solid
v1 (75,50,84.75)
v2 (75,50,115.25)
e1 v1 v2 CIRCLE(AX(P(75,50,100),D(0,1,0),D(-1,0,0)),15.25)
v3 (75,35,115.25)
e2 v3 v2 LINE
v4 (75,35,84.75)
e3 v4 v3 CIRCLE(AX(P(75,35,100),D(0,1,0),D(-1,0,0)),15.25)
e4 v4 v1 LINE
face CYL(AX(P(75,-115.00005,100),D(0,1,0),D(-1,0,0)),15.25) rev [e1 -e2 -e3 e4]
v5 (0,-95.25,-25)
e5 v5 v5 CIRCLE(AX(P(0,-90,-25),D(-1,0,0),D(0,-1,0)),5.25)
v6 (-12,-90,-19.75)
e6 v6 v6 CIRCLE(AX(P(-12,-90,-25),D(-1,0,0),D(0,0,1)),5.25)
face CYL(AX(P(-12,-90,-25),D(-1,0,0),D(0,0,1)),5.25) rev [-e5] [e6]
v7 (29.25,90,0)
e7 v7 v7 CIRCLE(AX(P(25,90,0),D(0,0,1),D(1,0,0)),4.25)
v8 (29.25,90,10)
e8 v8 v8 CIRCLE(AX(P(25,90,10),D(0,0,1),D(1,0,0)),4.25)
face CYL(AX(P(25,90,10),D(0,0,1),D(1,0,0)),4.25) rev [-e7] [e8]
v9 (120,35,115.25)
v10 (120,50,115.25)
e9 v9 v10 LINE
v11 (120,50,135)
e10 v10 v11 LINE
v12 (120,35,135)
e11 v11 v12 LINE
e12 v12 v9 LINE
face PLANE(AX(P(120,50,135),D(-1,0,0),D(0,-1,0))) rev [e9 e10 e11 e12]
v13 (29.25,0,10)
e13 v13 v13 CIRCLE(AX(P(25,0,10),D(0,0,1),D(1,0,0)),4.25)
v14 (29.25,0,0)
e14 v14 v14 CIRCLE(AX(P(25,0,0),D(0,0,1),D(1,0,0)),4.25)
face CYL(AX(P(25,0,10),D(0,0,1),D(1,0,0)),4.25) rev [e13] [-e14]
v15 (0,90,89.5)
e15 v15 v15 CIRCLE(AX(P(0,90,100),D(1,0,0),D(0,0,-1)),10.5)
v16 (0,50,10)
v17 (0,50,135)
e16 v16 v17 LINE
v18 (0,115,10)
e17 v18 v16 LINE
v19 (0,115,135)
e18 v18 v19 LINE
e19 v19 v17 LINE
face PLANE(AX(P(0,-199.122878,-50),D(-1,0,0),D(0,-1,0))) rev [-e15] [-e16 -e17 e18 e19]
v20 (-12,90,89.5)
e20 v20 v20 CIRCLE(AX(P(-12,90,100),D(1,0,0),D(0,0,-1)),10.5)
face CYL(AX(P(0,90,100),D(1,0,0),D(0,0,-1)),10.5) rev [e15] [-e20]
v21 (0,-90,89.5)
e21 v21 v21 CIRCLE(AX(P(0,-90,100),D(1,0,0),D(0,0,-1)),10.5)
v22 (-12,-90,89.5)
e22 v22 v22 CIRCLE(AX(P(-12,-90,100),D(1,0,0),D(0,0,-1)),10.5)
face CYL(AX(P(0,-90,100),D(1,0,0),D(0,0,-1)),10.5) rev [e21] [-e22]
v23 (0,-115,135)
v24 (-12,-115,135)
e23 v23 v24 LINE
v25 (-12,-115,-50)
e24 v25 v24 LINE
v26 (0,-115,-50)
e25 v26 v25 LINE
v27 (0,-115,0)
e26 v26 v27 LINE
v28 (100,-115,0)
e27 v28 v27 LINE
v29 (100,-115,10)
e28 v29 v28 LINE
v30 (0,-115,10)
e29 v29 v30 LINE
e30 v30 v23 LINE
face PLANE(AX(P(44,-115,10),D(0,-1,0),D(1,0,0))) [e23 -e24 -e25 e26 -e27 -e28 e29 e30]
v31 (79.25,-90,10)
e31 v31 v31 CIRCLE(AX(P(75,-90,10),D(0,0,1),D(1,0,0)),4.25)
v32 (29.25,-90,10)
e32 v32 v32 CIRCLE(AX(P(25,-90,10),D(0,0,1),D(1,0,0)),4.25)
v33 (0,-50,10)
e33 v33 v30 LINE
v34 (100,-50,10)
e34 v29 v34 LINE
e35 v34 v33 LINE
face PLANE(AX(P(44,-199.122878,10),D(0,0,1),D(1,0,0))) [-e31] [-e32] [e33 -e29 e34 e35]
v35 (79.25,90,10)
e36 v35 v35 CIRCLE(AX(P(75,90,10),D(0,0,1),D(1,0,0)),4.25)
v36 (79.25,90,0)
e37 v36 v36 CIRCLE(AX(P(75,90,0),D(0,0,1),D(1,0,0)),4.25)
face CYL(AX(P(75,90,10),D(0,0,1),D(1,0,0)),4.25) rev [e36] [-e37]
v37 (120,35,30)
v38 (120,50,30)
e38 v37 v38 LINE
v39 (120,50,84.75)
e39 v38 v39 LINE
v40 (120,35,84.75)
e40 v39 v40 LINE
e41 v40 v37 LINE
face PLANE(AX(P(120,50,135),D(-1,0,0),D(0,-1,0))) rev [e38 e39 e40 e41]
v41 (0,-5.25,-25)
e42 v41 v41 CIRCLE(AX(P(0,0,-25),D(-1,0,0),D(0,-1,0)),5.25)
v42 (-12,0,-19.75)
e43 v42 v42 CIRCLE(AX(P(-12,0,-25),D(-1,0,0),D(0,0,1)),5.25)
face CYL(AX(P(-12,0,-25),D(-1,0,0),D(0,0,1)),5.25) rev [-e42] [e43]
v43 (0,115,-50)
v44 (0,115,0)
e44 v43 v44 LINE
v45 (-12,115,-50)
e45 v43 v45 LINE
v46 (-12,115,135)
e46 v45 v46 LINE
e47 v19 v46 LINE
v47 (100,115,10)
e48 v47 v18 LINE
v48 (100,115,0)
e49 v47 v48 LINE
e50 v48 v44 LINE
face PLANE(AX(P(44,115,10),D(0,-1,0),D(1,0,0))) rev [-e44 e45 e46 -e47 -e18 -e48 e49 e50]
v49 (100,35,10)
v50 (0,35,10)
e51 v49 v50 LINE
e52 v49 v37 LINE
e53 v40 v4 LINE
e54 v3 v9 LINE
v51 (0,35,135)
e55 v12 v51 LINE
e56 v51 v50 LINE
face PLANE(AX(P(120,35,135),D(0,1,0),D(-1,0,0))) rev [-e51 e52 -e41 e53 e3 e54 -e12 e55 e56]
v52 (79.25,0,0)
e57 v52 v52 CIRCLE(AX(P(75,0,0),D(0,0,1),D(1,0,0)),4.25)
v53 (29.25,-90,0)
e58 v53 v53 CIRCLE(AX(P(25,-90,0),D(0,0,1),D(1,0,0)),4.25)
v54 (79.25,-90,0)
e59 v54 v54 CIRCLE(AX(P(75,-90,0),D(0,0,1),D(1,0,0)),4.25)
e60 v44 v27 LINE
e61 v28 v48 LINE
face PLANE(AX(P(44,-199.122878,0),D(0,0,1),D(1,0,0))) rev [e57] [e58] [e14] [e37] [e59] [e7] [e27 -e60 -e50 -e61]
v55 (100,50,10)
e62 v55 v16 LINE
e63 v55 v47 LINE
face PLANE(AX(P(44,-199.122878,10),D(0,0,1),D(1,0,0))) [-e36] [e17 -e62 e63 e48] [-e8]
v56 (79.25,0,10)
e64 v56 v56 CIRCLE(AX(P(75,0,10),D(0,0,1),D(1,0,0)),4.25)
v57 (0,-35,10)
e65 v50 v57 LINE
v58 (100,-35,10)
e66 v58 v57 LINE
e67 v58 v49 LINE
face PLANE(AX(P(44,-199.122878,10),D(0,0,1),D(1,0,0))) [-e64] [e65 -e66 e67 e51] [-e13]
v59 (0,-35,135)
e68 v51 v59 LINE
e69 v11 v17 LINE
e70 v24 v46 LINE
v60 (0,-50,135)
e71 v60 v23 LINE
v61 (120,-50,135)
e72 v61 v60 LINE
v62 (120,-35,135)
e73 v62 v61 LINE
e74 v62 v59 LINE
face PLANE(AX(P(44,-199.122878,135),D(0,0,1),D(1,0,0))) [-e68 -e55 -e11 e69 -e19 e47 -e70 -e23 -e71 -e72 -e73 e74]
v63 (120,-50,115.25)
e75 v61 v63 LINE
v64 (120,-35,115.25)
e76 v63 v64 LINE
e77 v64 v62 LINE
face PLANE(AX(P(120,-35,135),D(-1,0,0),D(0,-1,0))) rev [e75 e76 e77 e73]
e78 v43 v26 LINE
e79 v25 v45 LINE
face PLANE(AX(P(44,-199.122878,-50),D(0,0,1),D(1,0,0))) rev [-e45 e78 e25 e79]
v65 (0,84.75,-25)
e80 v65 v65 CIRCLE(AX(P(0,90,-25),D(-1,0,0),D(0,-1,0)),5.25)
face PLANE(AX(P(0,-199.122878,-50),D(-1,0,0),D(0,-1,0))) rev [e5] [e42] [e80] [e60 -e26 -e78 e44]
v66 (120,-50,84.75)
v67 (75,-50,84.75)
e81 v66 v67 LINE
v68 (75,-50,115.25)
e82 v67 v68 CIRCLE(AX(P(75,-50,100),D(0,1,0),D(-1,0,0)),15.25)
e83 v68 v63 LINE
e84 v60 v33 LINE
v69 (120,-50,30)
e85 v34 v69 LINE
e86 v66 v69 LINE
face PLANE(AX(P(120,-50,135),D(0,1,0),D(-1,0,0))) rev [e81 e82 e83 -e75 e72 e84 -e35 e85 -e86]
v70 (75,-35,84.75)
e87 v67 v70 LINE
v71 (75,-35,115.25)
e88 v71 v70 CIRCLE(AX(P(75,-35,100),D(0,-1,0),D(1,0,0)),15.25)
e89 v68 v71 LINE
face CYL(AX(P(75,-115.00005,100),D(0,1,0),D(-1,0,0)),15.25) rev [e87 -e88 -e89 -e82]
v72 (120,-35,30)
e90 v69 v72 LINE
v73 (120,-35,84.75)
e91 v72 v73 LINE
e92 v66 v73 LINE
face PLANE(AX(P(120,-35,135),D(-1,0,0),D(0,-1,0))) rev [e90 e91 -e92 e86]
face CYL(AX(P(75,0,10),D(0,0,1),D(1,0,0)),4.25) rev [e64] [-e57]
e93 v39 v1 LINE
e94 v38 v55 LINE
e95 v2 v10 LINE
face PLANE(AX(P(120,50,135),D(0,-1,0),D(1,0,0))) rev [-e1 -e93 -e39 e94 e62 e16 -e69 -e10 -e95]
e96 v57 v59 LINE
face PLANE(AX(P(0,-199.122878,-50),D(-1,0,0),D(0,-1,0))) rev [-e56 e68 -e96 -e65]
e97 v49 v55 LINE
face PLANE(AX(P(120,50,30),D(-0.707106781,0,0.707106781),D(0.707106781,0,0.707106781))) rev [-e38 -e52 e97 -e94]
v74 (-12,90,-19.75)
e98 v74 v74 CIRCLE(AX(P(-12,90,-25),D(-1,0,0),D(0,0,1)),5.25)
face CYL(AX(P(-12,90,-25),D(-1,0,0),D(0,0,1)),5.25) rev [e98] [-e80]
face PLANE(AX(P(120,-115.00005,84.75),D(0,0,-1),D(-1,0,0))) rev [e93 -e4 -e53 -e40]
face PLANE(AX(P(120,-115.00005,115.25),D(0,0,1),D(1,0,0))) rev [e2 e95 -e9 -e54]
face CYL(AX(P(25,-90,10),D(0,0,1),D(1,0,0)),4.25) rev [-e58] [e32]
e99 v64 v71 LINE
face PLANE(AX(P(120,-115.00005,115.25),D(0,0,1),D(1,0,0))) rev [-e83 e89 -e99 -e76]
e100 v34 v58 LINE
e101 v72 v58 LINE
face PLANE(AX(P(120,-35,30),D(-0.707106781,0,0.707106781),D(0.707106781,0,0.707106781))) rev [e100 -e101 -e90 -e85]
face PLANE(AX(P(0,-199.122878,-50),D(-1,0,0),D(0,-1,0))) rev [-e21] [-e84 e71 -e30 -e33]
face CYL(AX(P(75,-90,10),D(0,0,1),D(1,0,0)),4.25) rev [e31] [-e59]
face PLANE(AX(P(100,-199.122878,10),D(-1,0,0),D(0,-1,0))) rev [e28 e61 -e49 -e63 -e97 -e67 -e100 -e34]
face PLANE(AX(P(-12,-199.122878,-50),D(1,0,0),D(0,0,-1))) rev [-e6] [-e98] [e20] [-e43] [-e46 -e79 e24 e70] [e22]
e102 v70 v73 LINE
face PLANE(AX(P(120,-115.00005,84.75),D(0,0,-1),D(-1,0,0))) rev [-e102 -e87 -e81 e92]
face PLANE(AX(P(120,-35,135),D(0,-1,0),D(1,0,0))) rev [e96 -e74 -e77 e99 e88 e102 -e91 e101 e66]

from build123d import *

# Parameters (mm, degrees)
SKETCH_1_W              = 100
SKETCH_1_H              = 230
EXTRUDE_1_DEPTH         = 10
EXTRUDE_2_DEPTH         = 135
EXTRUDE_2_DEPTH_BACK    = 50
SKETCH_1_3_W            = 12
SKETCH_1_3_H            = 230
SKETCH_2_W              = 125
SKETCH_2_H              = 15
EXTRUDE_3_DEPTH         = 120
CUT_EXTRUDE_1_DEPTH     = 245.642596455
CHAMFER_2_SIZE          = 20
HOLE_WIZARD_3_D         = 21
HOLE_WIZARD_3_DEPTH     = 100
HOLE_WIZARD_M10_1_D     = 8.5
HOLE_WIZARD_M10_1_DEPTH = 24.5
HOLE_WIZARD_M10_1_TIP   = 2.553657631
HOLE_WIZARD_2_D         = 10.5
HOLE_WIZARD_2_DEPTH     = 100


with BuildPart() as part:
    # 草图1 → 凸台-拉伸1 (new body)
    with BuildSketch(Plane.XY):
        with Locations((50, 0)):
            Rectangle(SKETCH_1_W, SKETCH_1_H)
    extrude(amount=EXTRUDE_1_DEPTH)

    # 草图1<3> → 凸台-拉伸2 (add, two sides: drawn at the far end of the back side and taken through both)
    with BuildSketch(Plane.XY.offset(-EXTRUDE_2_DEPTH_BACK)):
        with Locations((-6, 0)):
            Rectangle(SKETCH_1_3_W, SKETCH_1_3_H)
    extrude(amount=EXTRUDE_2_DEPTH + EXTRUDE_2_DEPTH_BACK)

    # 草图2 → 凸台-拉伸3 (add)
    with BuildSketch(Plane(origin=(0, 0, 0), x_dir=(0, 0, -1), z_dir=(1, 0, 0))):
        with Locations((-72.5, -42.5)):
            Rectangle(SKETCH_2_W, SKETCH_2_H)
        with Locations((-72.5, 42.5)):
            Rectangle(SKETCH_2_W, SKETCH_2_H)
    extrude(amount=EXTRUDE_3_DEPTH)

    # 草图3 → 切除-拉伸1 (cut, through all)
    with BuildSketch(Plane(origin=(0, 50, 0), x_dir=(1, 0, 0), z_dir=(0, 1, 0))):
        with BuildLine():
            Line((120, -115.25), (75, -115.25))
            ThreePointArc((75, -115.25), (59.75, -100), (75, -84.75))
            Line((75, -84.75), (120, -84.75))
            ThreePointArc((120, -84.75), (135.25, -100), (120, -115.25))
        make_face()
    extrude(amount=-CUT_EXTRUDE_1_DEPTH, mode=Mode.SUBTRACT)

    # 倒角2
    chamfer_2_edges = [part.edges().sort_by_distance(p)[0] for p in [
        (120, 42.5, 10),
        (120, -42.5, 10),
    ]]
    chamfer(chamfer_2_edges, length=CHAMFER_2_SIZE - 0.0001)  # a hair under: the kernel refuses the full size

    # 孔3
    with Locations(Plane(origin=(0, 0, 0), x_dir=(0, 0, -1), z_dir=(1, 0, 0))):
        with Locations((-100, -90), (-100, 90)):
            Hole(HOLE_WIZARD_3_D / 2, depth=HOLE_WIZARD_3_DEPTH)

    # M10 螺纹孔1
    with Locations(Plane.XY.offset(10)):
        with Locations((25, -90), (75, -90), (75, 90), (25, 90), (75, 0), (25, 0)):
            Hole(HOLE_WIZARD_M10_1_D / 2, depth=HOLE_WIZARD_M10_1_DEPTH)
            with Locations((0, 0, -(HOLE_WIZARD_M10_1_DEPTH + HOLE_WIZARD_M10_1_TIP / 2))):  # 118° drill point
                Cone(0, HOLE_WIZARD_M10_1_D / 2, HOLE_WIZARD_M10_1_TIP, mode=Mode.SUBTRACT)

    # 孔2
    with Locations(Plane.ZY.offset(12)):
        with Locations((-25, 90), (-25, -90), (-25, 0)):
            Hole(HOLE_WIZARD_2_D / 2, depth=HOLE_WIZARD_2_DEPTH)


solid = part.part
